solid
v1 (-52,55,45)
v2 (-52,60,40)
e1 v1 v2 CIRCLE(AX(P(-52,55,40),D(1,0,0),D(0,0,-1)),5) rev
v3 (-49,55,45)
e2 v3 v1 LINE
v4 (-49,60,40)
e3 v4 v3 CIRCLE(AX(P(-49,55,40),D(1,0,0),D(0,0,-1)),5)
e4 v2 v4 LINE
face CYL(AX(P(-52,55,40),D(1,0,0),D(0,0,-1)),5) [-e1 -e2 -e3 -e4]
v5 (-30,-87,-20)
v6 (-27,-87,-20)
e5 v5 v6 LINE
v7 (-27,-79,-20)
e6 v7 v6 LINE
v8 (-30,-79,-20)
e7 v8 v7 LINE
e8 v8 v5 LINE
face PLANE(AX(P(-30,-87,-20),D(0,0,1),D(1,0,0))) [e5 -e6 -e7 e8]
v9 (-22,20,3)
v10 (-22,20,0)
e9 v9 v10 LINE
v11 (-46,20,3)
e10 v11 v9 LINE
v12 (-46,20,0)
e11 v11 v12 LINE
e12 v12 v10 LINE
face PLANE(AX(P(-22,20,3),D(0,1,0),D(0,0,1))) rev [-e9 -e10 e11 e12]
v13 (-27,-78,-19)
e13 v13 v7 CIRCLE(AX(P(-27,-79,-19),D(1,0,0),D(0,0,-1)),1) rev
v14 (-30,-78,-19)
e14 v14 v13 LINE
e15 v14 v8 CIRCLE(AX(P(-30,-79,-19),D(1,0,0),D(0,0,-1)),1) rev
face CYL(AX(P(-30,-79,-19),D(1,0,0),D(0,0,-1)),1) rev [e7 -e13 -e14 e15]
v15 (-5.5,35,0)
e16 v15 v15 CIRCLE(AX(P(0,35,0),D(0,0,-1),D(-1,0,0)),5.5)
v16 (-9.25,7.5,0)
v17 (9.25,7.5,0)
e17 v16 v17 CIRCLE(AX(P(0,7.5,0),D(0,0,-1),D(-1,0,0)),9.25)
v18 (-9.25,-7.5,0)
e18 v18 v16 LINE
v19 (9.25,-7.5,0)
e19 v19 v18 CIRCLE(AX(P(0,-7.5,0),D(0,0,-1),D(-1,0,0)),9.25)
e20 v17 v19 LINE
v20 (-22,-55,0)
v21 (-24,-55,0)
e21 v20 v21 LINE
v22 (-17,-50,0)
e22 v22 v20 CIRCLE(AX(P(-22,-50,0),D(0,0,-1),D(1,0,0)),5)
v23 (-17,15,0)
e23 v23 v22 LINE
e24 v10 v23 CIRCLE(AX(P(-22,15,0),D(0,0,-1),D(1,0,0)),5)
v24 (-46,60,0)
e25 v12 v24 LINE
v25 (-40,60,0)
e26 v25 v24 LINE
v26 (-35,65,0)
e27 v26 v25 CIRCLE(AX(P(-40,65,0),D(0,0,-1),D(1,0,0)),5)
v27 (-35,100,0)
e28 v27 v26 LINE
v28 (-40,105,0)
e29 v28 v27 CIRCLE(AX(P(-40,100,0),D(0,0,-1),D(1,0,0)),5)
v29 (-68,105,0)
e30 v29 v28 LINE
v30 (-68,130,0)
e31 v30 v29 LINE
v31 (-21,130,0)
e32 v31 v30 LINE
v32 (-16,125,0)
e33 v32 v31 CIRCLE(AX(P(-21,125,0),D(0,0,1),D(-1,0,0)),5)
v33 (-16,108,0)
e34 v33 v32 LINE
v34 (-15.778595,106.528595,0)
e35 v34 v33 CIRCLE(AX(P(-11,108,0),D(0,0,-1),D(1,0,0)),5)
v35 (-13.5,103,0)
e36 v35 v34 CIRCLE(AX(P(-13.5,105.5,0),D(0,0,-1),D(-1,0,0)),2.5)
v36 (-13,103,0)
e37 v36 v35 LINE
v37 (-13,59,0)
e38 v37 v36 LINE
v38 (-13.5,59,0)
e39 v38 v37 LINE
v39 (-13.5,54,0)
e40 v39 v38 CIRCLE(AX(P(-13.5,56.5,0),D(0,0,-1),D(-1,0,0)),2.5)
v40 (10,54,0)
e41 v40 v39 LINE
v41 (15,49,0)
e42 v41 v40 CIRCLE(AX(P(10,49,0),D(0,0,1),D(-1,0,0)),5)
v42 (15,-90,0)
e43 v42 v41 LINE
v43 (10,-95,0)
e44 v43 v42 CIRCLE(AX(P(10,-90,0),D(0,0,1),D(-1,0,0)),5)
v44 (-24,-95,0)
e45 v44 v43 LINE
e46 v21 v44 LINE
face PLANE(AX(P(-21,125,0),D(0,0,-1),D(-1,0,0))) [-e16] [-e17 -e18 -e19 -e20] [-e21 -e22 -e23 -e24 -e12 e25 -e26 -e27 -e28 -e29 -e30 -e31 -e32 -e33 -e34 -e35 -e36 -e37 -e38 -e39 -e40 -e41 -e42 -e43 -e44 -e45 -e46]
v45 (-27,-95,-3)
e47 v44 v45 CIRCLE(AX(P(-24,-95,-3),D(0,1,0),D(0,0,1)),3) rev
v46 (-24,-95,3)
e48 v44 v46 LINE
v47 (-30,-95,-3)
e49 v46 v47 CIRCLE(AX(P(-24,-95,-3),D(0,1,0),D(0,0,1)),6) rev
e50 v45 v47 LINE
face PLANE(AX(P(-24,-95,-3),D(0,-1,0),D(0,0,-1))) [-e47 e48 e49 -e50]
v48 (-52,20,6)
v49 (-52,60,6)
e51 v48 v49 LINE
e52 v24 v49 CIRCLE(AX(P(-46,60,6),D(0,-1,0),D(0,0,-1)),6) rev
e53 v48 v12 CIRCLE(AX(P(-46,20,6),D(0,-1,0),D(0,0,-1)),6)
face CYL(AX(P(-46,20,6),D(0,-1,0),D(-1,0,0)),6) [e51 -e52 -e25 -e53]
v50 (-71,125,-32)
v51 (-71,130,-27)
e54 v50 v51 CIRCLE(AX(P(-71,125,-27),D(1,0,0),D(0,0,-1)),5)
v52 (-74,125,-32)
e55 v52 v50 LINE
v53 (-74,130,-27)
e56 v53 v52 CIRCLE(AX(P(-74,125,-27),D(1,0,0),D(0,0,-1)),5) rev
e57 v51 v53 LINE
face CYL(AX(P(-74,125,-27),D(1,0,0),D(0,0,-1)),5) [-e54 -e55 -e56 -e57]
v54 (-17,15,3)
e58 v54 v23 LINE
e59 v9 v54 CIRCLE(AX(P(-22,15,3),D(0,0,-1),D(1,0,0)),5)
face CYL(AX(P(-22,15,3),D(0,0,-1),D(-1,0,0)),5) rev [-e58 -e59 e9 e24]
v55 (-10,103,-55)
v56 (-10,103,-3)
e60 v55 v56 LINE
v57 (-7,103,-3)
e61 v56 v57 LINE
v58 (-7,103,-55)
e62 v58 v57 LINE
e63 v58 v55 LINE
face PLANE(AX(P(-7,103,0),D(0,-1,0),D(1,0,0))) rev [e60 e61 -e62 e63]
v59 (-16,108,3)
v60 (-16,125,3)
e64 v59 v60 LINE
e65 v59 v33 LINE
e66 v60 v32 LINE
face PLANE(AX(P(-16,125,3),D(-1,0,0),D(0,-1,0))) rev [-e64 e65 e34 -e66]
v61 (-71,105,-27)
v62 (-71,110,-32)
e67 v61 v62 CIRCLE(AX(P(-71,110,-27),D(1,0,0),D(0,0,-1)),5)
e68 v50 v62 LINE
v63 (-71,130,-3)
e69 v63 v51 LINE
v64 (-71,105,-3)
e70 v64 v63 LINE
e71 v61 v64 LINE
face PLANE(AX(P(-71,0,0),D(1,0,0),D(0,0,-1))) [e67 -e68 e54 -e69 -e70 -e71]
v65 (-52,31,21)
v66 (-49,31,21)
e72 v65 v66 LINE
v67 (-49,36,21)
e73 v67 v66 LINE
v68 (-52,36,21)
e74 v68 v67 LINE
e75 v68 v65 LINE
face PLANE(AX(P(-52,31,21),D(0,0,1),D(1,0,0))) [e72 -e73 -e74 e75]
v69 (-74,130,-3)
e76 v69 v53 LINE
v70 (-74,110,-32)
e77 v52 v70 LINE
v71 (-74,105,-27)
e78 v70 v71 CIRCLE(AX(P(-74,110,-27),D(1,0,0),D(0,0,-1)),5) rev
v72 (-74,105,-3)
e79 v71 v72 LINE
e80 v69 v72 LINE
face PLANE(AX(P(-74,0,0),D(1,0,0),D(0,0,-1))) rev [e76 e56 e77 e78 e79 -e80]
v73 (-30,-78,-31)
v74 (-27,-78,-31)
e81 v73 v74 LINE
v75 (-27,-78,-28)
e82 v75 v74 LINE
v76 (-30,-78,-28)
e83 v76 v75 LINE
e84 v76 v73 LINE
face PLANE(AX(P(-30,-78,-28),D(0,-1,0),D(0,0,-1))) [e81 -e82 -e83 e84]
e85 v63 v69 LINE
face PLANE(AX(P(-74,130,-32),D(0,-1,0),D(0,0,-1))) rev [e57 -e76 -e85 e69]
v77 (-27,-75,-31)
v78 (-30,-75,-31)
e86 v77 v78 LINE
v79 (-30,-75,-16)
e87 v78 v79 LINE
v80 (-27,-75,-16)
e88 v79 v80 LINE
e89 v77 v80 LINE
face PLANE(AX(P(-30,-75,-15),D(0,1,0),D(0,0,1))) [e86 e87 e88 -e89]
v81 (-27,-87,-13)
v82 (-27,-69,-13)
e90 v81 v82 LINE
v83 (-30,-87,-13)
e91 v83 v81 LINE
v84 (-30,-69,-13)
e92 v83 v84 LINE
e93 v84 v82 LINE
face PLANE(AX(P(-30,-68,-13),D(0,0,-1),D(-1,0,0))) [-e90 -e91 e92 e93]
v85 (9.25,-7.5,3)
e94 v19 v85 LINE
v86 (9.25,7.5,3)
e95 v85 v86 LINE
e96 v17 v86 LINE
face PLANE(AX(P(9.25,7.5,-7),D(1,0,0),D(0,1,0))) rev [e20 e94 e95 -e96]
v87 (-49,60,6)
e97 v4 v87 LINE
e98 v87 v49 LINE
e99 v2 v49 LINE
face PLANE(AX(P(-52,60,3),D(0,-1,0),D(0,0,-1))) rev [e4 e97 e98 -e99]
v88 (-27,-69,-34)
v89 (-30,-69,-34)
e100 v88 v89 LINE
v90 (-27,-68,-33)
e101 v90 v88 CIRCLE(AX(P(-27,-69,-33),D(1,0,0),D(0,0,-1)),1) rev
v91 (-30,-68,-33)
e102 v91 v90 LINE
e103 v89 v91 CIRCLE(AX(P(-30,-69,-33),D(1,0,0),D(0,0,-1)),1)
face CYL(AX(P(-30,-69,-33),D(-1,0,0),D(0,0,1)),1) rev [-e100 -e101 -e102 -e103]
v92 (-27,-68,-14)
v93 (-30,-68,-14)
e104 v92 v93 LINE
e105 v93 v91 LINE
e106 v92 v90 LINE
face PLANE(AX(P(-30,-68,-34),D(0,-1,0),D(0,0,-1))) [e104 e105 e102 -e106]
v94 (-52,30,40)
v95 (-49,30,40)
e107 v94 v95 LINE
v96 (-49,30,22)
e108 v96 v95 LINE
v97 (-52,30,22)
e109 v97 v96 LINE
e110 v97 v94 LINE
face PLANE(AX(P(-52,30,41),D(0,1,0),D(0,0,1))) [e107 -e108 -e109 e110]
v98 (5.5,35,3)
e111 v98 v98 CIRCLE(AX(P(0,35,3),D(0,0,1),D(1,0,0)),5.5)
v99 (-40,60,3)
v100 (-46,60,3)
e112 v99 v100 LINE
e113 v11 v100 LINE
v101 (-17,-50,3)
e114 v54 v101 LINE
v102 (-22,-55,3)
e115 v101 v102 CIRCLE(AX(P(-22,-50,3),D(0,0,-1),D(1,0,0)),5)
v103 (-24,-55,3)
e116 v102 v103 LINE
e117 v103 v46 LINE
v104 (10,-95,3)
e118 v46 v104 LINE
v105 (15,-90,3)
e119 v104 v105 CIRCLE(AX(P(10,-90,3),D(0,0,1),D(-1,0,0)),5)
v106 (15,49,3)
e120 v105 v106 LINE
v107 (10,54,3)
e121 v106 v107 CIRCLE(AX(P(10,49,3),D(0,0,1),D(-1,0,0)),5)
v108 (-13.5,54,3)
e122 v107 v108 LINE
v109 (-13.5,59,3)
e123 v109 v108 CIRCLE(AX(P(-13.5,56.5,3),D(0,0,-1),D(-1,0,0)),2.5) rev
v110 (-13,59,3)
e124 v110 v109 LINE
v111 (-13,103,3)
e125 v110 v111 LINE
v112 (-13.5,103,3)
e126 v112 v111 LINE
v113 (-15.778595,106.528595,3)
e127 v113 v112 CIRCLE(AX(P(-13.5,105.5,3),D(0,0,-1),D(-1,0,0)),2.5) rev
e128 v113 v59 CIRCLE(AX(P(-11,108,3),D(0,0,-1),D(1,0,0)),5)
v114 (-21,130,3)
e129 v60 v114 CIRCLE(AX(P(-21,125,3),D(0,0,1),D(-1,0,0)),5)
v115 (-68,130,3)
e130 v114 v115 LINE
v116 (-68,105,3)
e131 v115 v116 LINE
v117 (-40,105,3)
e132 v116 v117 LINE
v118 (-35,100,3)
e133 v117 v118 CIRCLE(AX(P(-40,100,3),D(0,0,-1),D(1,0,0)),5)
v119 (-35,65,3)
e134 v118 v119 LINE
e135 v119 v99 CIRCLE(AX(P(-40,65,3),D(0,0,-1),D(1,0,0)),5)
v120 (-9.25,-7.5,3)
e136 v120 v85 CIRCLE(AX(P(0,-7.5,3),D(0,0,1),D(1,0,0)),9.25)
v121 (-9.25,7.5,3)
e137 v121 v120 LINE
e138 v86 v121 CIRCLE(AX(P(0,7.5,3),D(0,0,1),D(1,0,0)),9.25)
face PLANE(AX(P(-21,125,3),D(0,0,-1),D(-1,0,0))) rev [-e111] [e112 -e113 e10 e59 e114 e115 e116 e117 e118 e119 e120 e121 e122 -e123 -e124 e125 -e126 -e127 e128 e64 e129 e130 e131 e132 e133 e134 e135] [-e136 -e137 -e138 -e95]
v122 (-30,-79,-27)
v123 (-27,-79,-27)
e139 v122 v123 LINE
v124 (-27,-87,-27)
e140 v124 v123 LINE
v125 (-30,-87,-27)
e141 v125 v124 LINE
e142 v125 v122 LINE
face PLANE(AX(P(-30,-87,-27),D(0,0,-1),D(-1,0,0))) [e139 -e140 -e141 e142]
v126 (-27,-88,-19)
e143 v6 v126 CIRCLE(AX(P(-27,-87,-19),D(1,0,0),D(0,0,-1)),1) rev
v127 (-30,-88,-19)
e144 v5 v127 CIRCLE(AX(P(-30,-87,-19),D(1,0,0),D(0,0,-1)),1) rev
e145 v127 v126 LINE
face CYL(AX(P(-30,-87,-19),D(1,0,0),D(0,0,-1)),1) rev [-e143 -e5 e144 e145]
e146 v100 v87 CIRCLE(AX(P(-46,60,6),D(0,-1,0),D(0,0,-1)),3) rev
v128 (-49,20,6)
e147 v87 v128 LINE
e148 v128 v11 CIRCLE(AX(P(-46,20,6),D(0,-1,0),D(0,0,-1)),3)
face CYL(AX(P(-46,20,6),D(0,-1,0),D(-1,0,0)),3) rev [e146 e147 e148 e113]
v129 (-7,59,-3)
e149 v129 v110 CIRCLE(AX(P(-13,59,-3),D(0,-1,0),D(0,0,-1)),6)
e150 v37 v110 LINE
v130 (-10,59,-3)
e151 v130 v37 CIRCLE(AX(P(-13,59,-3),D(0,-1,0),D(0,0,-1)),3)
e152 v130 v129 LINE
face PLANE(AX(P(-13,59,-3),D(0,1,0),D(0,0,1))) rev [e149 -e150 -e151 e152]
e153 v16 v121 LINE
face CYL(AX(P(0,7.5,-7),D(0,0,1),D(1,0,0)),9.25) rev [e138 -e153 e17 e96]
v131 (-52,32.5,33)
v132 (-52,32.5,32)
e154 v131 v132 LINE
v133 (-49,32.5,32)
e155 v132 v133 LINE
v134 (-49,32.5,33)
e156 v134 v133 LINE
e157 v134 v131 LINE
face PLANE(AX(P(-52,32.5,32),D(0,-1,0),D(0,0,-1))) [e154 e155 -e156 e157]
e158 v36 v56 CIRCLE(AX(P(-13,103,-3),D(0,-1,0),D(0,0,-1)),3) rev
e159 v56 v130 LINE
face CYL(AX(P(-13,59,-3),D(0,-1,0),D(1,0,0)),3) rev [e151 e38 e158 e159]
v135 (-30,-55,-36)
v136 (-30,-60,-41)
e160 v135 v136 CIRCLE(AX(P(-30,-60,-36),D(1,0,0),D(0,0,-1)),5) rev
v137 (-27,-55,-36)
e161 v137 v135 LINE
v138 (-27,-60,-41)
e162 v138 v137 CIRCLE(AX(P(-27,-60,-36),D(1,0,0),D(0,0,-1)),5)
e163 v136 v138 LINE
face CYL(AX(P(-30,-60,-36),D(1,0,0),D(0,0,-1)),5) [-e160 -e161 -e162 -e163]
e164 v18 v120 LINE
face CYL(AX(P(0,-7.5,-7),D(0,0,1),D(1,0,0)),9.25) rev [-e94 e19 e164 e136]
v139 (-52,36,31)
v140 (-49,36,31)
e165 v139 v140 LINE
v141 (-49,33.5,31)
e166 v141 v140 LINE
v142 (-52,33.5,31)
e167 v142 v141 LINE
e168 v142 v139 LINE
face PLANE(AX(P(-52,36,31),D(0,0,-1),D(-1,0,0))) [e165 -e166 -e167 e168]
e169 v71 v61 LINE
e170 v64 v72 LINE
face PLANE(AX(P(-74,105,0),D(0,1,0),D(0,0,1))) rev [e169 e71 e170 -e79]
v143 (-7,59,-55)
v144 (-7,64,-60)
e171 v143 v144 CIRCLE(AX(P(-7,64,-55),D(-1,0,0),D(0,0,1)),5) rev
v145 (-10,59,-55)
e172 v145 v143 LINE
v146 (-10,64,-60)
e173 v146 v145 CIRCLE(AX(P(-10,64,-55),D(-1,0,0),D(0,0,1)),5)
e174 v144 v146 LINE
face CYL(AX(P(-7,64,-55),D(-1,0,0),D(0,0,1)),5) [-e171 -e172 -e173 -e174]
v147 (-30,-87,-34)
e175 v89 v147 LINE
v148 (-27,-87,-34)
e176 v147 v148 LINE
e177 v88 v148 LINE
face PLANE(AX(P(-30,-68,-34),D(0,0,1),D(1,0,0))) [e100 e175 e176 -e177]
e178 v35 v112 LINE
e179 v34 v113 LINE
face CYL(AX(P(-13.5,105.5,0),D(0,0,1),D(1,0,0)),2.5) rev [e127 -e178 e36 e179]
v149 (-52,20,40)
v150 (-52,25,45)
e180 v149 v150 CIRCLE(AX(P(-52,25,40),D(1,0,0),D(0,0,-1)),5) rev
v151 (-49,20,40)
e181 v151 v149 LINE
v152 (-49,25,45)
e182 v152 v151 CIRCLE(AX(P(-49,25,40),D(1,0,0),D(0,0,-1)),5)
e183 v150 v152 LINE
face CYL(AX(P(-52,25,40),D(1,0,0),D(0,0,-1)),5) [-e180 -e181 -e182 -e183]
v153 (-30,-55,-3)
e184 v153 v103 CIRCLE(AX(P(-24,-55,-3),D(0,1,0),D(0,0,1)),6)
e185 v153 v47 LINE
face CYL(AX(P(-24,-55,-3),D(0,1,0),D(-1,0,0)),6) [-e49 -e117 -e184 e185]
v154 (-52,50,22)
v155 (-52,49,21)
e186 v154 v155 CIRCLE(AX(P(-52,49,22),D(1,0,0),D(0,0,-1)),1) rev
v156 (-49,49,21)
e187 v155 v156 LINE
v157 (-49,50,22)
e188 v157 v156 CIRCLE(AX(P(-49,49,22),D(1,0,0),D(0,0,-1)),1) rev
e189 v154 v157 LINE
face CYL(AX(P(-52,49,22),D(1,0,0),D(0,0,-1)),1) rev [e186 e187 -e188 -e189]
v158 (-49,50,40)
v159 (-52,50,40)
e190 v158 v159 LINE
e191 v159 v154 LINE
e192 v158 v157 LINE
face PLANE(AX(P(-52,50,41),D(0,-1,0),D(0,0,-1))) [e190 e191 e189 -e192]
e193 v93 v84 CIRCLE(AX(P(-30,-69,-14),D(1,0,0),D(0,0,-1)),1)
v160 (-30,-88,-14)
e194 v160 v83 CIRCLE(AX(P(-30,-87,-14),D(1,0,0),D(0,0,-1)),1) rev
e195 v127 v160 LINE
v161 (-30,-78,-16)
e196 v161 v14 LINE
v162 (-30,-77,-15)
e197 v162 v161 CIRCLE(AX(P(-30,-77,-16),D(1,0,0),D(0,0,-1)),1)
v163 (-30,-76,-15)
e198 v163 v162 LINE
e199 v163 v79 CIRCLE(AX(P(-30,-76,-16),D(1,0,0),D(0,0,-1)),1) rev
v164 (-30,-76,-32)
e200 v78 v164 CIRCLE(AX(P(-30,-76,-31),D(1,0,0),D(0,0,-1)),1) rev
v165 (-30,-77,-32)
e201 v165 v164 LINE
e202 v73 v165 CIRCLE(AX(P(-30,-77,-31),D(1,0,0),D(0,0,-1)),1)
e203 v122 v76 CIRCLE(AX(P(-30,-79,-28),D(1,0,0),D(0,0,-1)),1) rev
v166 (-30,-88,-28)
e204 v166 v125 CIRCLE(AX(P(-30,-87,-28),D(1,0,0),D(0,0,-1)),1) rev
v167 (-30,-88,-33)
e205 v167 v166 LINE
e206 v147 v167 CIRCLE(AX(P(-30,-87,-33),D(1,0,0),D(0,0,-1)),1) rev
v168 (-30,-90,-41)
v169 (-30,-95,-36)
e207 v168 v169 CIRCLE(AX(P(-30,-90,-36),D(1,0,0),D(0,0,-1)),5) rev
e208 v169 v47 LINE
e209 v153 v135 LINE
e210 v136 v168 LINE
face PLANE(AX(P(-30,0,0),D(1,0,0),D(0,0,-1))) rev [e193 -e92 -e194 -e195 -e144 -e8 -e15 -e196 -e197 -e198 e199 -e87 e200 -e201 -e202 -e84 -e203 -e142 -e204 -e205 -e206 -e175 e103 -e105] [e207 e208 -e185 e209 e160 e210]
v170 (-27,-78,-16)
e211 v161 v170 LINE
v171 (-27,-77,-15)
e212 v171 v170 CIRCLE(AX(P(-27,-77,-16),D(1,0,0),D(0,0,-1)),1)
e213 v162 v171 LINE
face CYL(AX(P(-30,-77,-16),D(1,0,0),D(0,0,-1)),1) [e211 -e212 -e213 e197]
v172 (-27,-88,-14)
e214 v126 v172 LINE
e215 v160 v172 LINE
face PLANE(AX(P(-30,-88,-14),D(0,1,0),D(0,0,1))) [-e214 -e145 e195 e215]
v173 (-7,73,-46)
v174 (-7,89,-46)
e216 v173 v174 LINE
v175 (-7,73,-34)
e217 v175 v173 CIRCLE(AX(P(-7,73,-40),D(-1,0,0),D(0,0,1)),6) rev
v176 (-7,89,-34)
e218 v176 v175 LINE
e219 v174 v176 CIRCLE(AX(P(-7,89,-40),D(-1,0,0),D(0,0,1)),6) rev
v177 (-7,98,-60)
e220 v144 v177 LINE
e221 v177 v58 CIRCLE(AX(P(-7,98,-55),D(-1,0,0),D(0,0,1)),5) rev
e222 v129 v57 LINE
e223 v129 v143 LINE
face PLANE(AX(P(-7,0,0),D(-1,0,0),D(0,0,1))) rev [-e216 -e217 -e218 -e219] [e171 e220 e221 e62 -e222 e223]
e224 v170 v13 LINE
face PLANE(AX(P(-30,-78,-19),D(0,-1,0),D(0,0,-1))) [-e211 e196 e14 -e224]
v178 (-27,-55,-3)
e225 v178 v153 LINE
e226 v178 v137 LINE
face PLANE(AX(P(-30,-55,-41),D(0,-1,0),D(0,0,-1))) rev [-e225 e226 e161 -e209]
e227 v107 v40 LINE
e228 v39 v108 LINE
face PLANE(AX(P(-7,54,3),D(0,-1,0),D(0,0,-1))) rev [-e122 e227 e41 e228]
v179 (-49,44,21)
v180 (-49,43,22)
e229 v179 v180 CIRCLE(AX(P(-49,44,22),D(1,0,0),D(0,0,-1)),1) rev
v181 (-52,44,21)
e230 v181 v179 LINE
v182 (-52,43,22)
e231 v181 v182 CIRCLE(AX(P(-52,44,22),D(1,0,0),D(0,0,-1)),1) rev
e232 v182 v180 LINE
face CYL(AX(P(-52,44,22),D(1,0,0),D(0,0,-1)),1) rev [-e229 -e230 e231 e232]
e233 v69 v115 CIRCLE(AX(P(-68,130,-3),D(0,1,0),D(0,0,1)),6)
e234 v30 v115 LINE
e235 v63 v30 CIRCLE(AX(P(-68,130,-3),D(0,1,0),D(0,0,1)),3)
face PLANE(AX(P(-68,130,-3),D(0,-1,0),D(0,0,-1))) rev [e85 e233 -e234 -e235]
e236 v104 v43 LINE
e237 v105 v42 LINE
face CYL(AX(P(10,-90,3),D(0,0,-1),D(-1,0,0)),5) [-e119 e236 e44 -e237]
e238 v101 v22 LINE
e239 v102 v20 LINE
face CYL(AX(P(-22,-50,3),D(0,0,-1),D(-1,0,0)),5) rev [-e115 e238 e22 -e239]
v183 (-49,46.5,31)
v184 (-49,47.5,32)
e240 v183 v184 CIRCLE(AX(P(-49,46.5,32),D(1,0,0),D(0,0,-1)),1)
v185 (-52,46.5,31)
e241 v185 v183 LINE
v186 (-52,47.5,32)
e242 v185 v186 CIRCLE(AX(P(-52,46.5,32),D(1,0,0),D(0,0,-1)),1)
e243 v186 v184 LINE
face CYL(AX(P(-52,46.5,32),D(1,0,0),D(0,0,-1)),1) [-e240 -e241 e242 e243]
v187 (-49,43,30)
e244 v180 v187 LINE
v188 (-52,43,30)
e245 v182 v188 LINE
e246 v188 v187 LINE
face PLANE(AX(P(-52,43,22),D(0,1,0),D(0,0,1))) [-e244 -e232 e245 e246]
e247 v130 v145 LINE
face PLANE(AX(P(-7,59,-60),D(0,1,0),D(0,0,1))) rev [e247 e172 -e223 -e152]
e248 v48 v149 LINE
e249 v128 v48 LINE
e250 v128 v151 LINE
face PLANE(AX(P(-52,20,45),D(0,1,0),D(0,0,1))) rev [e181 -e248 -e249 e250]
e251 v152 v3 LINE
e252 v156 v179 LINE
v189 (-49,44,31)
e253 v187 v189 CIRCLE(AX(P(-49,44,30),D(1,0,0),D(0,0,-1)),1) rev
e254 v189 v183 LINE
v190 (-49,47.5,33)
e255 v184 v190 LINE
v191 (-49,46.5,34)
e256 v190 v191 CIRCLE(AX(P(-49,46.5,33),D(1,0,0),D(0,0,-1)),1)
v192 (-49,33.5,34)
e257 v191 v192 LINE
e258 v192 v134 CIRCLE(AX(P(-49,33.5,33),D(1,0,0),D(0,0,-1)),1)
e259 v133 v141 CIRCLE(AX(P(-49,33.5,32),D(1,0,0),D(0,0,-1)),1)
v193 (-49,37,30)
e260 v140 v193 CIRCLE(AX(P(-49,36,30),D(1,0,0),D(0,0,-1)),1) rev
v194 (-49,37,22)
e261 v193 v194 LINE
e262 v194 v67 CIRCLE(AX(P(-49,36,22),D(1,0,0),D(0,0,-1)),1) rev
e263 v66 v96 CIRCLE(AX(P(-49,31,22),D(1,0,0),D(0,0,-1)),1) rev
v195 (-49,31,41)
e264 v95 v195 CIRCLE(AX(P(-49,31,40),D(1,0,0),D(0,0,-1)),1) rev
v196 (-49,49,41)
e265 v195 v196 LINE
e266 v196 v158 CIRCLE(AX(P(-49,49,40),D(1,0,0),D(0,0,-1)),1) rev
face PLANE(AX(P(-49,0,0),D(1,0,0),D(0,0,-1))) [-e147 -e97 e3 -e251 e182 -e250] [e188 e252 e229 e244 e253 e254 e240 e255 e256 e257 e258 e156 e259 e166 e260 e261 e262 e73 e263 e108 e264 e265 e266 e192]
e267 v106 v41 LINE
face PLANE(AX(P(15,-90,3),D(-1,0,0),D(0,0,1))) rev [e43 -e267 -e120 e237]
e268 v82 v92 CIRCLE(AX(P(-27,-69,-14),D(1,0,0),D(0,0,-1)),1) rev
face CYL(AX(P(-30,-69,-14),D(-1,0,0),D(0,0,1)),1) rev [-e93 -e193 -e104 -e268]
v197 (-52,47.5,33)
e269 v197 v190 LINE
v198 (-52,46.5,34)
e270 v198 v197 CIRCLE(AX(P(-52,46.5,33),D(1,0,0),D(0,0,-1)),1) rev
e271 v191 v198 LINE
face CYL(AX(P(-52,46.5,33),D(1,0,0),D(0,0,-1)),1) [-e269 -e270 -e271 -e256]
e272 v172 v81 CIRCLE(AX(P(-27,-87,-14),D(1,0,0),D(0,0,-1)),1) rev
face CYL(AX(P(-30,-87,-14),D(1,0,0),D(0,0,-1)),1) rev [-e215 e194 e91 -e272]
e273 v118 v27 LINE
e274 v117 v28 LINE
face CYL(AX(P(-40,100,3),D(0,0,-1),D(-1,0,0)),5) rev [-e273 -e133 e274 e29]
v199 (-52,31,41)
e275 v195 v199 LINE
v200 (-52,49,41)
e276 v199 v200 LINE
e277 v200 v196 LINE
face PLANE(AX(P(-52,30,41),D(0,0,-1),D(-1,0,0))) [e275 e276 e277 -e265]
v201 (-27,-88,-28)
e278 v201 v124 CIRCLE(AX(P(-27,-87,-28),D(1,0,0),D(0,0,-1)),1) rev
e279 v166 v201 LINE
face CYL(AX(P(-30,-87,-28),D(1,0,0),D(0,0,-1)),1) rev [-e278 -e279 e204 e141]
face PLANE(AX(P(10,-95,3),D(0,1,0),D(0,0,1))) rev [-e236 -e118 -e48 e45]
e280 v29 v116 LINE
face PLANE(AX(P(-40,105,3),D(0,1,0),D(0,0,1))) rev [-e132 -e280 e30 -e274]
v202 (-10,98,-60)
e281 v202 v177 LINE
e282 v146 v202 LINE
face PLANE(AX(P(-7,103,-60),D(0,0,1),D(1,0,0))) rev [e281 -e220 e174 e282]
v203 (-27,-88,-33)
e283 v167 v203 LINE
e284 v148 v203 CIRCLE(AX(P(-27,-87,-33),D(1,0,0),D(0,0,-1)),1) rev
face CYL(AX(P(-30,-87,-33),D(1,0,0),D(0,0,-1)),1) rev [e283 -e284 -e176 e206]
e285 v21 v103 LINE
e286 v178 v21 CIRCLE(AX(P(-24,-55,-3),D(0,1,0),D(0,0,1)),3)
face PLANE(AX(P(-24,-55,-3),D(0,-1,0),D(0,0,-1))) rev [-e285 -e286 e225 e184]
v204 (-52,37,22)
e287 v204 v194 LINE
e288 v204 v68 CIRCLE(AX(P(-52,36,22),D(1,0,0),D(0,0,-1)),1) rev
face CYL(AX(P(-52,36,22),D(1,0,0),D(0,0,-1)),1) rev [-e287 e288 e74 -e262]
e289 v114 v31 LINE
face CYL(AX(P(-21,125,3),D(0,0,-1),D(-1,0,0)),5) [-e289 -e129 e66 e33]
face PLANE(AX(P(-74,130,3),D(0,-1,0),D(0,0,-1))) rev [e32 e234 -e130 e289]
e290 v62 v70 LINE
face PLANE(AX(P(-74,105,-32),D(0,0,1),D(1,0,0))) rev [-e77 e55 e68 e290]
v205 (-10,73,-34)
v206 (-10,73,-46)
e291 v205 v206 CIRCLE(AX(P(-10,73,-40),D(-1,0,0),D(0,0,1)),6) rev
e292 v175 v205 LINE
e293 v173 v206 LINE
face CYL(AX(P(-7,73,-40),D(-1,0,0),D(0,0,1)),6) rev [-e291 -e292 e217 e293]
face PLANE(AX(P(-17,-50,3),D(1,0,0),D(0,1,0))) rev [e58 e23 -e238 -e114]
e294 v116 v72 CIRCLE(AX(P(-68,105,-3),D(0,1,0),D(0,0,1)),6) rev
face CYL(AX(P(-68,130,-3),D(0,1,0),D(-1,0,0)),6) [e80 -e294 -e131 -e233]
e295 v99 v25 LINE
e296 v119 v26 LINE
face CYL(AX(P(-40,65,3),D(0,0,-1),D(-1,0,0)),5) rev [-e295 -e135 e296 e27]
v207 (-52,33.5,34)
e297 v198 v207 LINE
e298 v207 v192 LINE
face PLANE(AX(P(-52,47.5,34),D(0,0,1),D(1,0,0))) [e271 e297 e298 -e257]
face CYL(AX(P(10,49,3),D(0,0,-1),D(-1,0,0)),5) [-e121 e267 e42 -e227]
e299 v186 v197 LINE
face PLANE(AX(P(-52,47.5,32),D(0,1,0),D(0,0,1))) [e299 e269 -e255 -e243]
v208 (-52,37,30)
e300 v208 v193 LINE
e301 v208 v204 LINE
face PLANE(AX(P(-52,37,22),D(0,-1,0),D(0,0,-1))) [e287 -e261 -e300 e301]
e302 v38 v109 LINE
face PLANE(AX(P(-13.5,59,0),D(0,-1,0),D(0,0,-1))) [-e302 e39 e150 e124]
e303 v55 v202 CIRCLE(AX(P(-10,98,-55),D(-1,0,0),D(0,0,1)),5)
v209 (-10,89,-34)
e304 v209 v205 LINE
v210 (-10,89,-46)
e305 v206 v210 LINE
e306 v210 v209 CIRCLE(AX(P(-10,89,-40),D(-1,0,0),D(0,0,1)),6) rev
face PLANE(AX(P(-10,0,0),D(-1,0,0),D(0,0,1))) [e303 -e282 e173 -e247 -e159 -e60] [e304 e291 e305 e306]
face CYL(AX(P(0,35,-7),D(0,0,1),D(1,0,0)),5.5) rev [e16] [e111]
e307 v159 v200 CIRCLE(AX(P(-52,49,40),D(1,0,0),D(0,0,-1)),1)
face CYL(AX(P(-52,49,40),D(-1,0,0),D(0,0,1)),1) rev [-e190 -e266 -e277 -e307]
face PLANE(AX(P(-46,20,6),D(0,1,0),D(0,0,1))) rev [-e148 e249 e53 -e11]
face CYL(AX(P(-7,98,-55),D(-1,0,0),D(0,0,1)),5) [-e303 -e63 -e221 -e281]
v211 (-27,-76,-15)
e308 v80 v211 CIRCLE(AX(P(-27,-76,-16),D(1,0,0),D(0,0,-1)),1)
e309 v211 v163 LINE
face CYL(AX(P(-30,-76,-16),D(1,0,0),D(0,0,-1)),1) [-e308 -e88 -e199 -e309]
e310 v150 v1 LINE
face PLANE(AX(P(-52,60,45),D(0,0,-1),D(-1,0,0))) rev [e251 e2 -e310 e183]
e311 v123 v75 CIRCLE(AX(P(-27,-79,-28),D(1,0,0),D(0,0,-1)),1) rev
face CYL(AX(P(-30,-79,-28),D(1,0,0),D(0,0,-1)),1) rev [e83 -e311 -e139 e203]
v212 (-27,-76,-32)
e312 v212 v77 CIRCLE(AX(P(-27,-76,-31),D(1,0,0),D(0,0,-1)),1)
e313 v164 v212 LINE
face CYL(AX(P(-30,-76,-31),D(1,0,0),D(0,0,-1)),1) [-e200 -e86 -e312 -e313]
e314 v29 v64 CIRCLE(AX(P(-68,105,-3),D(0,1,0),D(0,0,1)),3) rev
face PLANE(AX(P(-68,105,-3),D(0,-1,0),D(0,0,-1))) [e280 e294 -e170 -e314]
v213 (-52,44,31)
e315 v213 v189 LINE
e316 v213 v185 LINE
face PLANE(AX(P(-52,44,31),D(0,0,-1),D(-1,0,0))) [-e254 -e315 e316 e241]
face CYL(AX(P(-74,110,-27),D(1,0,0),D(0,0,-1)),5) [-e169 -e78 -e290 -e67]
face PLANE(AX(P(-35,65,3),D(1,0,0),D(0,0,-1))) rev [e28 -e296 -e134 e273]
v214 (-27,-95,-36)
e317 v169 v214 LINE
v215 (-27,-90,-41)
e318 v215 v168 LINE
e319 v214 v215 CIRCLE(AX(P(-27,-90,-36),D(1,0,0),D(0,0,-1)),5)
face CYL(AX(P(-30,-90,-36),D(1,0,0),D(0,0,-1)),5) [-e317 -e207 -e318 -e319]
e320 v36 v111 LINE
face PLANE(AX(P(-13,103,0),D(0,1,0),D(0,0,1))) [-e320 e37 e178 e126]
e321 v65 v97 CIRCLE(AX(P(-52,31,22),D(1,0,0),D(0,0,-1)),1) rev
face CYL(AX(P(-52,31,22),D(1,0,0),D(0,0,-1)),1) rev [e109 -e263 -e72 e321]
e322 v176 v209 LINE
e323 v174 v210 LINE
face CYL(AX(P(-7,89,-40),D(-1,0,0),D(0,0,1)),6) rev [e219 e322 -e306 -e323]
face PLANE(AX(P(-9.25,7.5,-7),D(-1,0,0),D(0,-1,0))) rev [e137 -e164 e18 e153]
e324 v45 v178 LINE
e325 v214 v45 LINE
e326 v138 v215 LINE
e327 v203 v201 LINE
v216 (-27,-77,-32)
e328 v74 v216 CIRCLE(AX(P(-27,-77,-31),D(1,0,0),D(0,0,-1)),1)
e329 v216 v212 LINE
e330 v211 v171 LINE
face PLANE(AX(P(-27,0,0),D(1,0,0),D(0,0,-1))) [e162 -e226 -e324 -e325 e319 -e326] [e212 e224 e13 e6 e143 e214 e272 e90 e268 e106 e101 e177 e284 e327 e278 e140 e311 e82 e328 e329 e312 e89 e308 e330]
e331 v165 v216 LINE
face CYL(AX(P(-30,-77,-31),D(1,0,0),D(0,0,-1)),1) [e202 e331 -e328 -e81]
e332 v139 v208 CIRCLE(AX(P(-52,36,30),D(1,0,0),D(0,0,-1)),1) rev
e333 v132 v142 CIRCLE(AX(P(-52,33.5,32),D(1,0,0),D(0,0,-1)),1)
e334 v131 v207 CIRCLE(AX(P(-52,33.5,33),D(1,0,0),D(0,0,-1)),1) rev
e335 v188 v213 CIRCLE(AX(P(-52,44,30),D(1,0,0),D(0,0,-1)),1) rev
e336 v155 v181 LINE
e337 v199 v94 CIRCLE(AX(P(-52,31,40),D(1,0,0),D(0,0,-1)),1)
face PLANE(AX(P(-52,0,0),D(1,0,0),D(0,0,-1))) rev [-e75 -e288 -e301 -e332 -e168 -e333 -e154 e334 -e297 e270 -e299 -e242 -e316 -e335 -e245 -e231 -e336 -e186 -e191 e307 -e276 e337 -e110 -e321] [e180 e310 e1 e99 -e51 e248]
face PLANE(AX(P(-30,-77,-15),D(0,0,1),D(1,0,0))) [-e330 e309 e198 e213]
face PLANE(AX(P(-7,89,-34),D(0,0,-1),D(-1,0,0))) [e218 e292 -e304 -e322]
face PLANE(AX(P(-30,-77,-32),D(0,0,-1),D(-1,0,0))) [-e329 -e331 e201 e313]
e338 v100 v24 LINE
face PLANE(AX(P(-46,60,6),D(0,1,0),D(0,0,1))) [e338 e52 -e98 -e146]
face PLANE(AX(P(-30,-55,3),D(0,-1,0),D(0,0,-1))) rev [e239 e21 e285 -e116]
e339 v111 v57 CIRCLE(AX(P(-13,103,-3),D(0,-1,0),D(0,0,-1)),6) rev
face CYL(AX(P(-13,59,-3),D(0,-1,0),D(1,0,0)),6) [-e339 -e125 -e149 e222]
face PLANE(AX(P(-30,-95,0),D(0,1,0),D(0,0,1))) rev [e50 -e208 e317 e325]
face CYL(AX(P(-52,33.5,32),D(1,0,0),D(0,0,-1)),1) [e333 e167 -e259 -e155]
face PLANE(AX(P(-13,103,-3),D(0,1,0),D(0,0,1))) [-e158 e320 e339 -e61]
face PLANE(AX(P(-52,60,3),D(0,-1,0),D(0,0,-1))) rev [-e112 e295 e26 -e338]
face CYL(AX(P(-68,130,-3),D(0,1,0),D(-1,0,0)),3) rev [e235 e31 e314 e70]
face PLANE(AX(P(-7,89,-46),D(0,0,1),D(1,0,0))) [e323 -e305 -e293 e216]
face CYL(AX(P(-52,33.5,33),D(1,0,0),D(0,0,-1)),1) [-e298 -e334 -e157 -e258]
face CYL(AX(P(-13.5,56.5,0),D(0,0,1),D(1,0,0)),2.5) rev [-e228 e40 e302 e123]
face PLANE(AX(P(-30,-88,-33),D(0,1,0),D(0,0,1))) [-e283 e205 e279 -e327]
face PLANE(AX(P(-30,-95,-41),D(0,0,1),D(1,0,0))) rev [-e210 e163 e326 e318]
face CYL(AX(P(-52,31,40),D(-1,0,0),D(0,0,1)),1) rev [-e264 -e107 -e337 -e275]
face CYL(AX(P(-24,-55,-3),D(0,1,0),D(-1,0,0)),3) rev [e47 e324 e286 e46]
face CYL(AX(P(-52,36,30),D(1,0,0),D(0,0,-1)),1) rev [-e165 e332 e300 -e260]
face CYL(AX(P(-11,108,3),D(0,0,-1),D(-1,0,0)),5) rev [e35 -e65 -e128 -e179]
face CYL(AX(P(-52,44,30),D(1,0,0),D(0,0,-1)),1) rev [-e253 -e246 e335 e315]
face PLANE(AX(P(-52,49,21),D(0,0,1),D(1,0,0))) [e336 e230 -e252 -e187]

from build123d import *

# Parameters (mm, degrees)
BASE_FLANGE1_DEPTH           = 3
SKETCH6_R                    = 5.5
CUT_EXTRUDE1_DEPTH           = 10
EDGE_FLANGE2_START           = -6.5
EDGE_FLANGE2_OUTLINE_W       = 5
EDGE_FLANGE2_OUTLINE_H       = 3
EDGE_FLANGE2_DEPTH           = 6.5
EDGE_FLANGE2_START_2         = -0.63372
EDGE_FLANGE2_2_OUTLINE_W     = 44
EDGE_FLANGE2_2_OUTLINE_H     = 3
EDGE_FLANGE2_2_DEPTH         = 0.63372
EDGE_FLANGE2_START_3         = -3
EDGE_FLANGE2_3_OUTLINE_W     = 44
EDGE_FLANGE2_3_OUTLINE_H     = 60
EDGE_FLANGE2_3_DEPTH         = 2.36628
EDGE_FLANGE2_4_DEPTH         = 3
EDGE_FLANGE2_START_4         = -34
EDGE_FLANGE2_5_OUTLINE_W     = 0.63372
EDGE_FLANGE2_5_OUTLINE_H     = 44
EDGE_FLANGE2_5_DEPTH         = 31
EDGE_FLANGE2_START_5         = -60
EDGE_FLANGE2_6_OUTLINE_W     = 0.63372
EDGE_FLANGE2_6_OUTLINE_H     = 44
EDGE_FLANGE2_6_DEPTH         = 14
EDGE_FLANGE2_START_6         = 59
EDGE_FLANGE2_7_DEPTH         = 44
EDGE_FLANGE2_8_OUTLINE_W     = 0.63372
EDGE_FLANGE2_8_OUTLINE_H     = 12
EDGE_FLANGE2_8_DEPTH         = 2.2355
EDGE_FLANGE2_START_7         = -7.63372
EDGE_FLANGE2_9_DEPTH         = 0.63372
EDGE_FLANGE2_10_DEPTH        = 44
EDGE_FLANGE2_START_8         = -7.76405
EDGE_FLANGE2_11_OUTLINE_W    = 44
EDGE_FLANGE2_11_OUTLINE_H    = 3
EDGE_FLANGE2_11_DEPTH        = 0.13033
FILLET1_R                    = 5
EDGE_FLANGE3_STRIP_W         = 18
EDGE_FLANGE3_STRIP_H         = 3
EDGE_FLANGE3_STRIP_CUT_DEPTH = 25
EDGE_FLANGE3_DEPTH           = 25
FILLET2_R                    = 5
EDGE_FLANGE4_STRIP_W         = 18
EDGE_FLANGE4_STRIP_H         = 3
EDGE_FLANGE4_STRIP_CUT_DEPTH = 40
EDGE_FLANGE4_DEPTH           = 40
EDGE_FLANGE4_PROFILE_W       = 40
EDGE_FLANGE4_PROFILE_H       = 39
EDGE_FLANGE4_FLAT_DEPTH      = 3
FILLET3_R                    = 1
FILLET4_R                    = 5
EDGE_FLANGE5_STRIP_W         = 18
EDGE_FLANGE5_STRIP_H         = 3
EDGE_FLANGE5_STRIP_CUT_DEPTH = 40
EDGE_FLANGE5_DEPTH           = 40
EDGE_FLANGE5_PROFILE_W       = 40
EDGE_FLANGE5_PROFILE_H       = 38
EDGE_FLANGE5_FLAT_DEPTH      = 3
FILLET5_R                    = 1
FILLET6_R                    = 5


with BuildPart() as part:
    # Base-Flange1: sheet metal written as solids
    # Sketch1 → Base-Flange1 (new body)
    with BuildSketch(Plane(origin=(0, 0, 0), x_dir=(0, 1, 0), z_dir=(0, 0, 1))):
        with BuildLine():
            Line((-90, -15), (49, -15))
            ThreePointArc((49, -15), (52.535533906, -13.535533906), (54, -10))
            Line((54, -10), (54, 7))
            Line((54, 7), (103, 7))
            Line((103, 7), (103, 11))
            ThreePointArc((103, 11), (104.464466094, 14.535533906), (108, 16))
            Line((108, 16), (125, 16))
            ThreePointArc((125, 16), (128.535533906, 17.464466094), (130, 21))
            Line((130, 21), (130, 74))
            Line((130, 74), (105, 74))
            Line((105, 74), (105, 40))
            ThreePointArc((105, 40), (103.535533906, 36.464466094), (100, 35))
            Line((100, 35), (65, 35))
            ThreePointArc((65, 35), (61.464466094, 36.464466094), (60, 40))
            Line((60, 40), (60, 52))
            Line((60, 52), (20, 52))
            Line((20, 52), (20, 22))
            ThreePointArc((20, 22), (18.535533906, 18.464466094), (15, 17))
            Line((15, 17), (-50, 17))
            ThreePointArc((-50, 17), (-53.535533906, 18.464466094), (-55, 22))
            Line((-55, 22), (-55, 30))
            Line((-55, 30), (-95, 30))
            Line((-95, 30), (-95, -10))
            ThreePointArc((-95, -10), (-93.535533906, -13.535533906), (-90, -15))
        make_face()
    extrude(amount=BASE_FLANGE1_DEPTH)

    # Sketch6 → Cut-Extrude1 (cut)
    with BuildSketch(Plane.XY.offset(3)):
        with Locations((0, 35)):
            Circle(SKETCH6_R)
        with BuildLine():
            Line((9.25, 7.5), (9.25, -7.5))
            ThreePointArc((9.25, -7.5), (0, -16.75), (-9.25, -7.5))
            Line((-9.25, -7.5), (-9.25, 7.5))
            ThreePointArc((-9.25, 7.5), (0, 16.75), (9.25, 7.5))
        make_face()
    extrude(amount=-CUT_EXTRUDE1_DEPTH, mode=Mode.SUBTRACT)

    # Edge-Flange2: read off the stored shape, not the designer's step
    # Edge-Flange2 outline → Edge-Flange2 (cut)
    with BuildSketch(Plane(origin=(-7, 0, 0), x_dir=(0, -1, 0), z_dir=(1, 0, 0)).offset(EDGE_FLANGE2_START)):
        with Locations((-56.5, -1.5)):
            Rectangle(EDGE_FLANGE2_OUTLINE_W, EDGE_FLANGE2_OUTLINE_H)
    extrude(amount=EDGE_FLANGE2_DEPTH, mode=Mode.SUBTRACT)

    # Edge-Flange2 2 outline → Edge-Flange2 2 (cut)
    with BuildSketch(Plane(origin=(-7, 0, 0), x_dir=(0, -1, 0), z_dir=(1, 0, 0)).offset(EDGE_FLANGE2_START_2)):
        with Locations((-81, -1.5)):
            Rectangle(EDGE_FLANGE2_2_OUTLINE_W, EDGE_FLANGE2_2_OUTLINE_H)
    extrude(amount=EDGE_FLANGE2_2_DEPTH, mode=Mode.SUBTRACT)

    # Edge-Flange2 3 outline → Edge-Flange2 3 (add)
    with BuildSketch(Plane(origin=(-7, 0, 0), x_dir=(0, -1, 0), z_dir=(1, 0, 0)).offset(EDGE_FLANGE2_START_3)):
        with Locations((-81, 30)):
            Rectangle(EDGE_FLANGE2_3_OUTLINE_W, EDGE_FLANGE2_3_OUTLINE_H)
        with BuildLine():
            Line((-73, 34), (-89, 34))
            ThreePointArc((-89, 34), (-95, 40), (-89, 46))
            Line((-89, 46), (-73, 46))
            ThreePointArc((-73, 46), (-67, 40), (-73, 34))
        make_face(mode=Mode.SUBTRACT)
    extrude(amount=EDGE_FLANGE2_3_DEPTH)

    # Edge-Flange2 4 outline → Edge-Flange2 4 (cut)
    with BuildSketch(Plane.XY):
        with BuildLine():
            Line((-13.5, 54), (-13.5, 59))
            ThreePointArc((-13.5, 59), (-16, 56.5), (-13.5, 54))
        make_face()
        with BuildLine():
            Line((-13.5, 103), (-11, 103))
            ThreePointArc((-11, 103), (-13.970098723, 103.977747698), (-15.778594569, 106.528594569))
            ThreePointArc((-15.778594569, 106.528594569), (-15.600176948, 104.143807982), (-13.5, 103))
        make_face()
    extrude(amount=EDGE_FLANGE2_4_DEPTH, mode=Mode.SUBTRACT)

    # Edge-Flange2 5 outline → Edge-Flange2 5 (add)
    with BuildSketch(Plane.XY.offset(EDGE_FLANGE2_START_4)):
        with Locations((-7.31686, 81)):
            Rectangle(EDGE_FLANGE2_5_OUTLINE_W, EDGE_FLANGE2_5_OUTLINE_H)
    extrude(amount=EDGE_FLANGE2_5_DEPTH)

    # Edge-Flange2 6 outline → Edge-Flange2 6 (add)
    with BuildSketch(Plane.XY.offset(EDGE_FLANGE2_START_5)):
        with Locations((-7.31686, 81)):
            Rectangle(EDGE_FLANGE2_6_OUTLINE_W, EDGE_FLANGE2_6_OUTLINE_H)
    extrude(amount=EDGE_FLANGE2_6_DEPTH)

    # Edge-Flange2 7 outline → Edge-Flange2 7 (add)
    with BuildSketch(Plane(origin=(0, 0, 0), x_dir=(1, 0, 0), z_dir=(0, 1, 0)).offset(EDGE_FLANGE2_START_6)):
        with BuildLine():
            ThreePointArc((-7.63372, 0.31615221), (-7.160578796, 1.621174413), (-7, 3))
            Line((-7, 3), (-7.63372, 3))
            Line((-7.63372, 3), (-7.63372, 0.31615221))
        make_face()
        with BuildLine():
            Line((-13, 0), (-10, 0))
            Line((-10, 0), (-10, 3))
            ThreePointArc((-10, 3), (-10.878679656, 0.878679656), (-13, 0))
        make_face()
    extrude(amount=EDGE_FLANGE2_7_DEPTH)

    # Edge-Flange2 8 outline → Edge-Flange2 8 (add)
    with BuildSketch(Plane(origin=(0, 0, 0), x_dir=(1, 0, 0), z_dir=(0, 1, 0)).offset(EDGE_FLANGE2_START_6)):
        with Locations((-7.31686, 40)):
            Rectangle(EDGE_FLANGE2_8_OUTLINE_W, EDGE_FLANGE2_8_OUTLINE_H)
    extrude(amount=EDGE_FLANGE2_8_DEPTH)

    # Edge-Flange2 9 outline → Edge-Flange2 9 (add)
    with BuildSketch(Plane.YZ.offset(EDGE_FLANGE2_START_7)):
        with BuildLine():
            Line((103, -46), (103, -34))
            Line((103, -34), (89, -34))
            ThreePointArc((89, -34), (95, -40), (89, -46))
            Line((89, -46), (103, -46))
        make_face()
        with BuildLine():
            Line((73, -34), (59, -34))
            Line((59, -34), (59, -46))
            Line((59, -46), (73, -46))
            ThreePointArc((73, -46), (67, -40), (73, -34))
        make_face()
    extrude(amount=EDGE_FLANGE2_9_DEPTH)

    # Edge-Flange2 10 outline → Edge-Flange2 10 (cut)
    with BuildSketch(Plane(origin=(0, 0, 0), x_dir=(1, 0, 0), z_dir=(0, 1, 0)).offset(EDGE_FLANGE2_START_6)):
        with BuildLine():
            ThreePointArc((-7.63372, 0.31615221), (-9.845882591, -2.104071254), (-13, -3))
            Line((-13, -3), (-7.63372, -3))
            Line((-7.63372, -3), (-7.63372, 0.31615221))
        make_face()
    extrude(amount=EDGE_FLANGE2_10_DEPTH, mode=Mode.SUBTRACT)

    # Edge-Flange2 11 outline → Edge-Flange2 11 (cut)
    with BuildSketch(Plane.YZ.offset(EDGE_FLANGE2_START_8)):
        with Locations((81, 1.5)):
            Rectangle(EDGE_FLANGE2_11_OUTLINE_W, EDGE_FLANGE2_11_OUTLINE_H)
    extrude(amount=EDGE_FLANGE2_11_DEPTH, mode=Mode.SUBTRACT)

    # Fillet1
    fillet1_edges = [part.edges().sort_by_distance(p)[0] for p in [
        (-8.5, 103, -60),
        (-8.5, 59, -60),
    ]]
    fillet(fillet1_edges, radius=FILLET1_R)

    # Edge-Flange3: sheet metal written as solids
    # Edge-Flange3 strip (on a plane across the edge) → Edge-Flange3 strip cut (cut)
    with BuildSketch(Plane(origin=(-74, 105, 0), x_dir=(1, 0, 0), z_dir=(0, 1, 0))):
        with Locations((-3, -1.5)):
            Rectangle(EDGE_FLANGE3_STRIP_W, EDGE_FLANGE3_STRIP_H)
    extrude(amount=EDGE_FLANGE3_STRIP_CUT_DEPTH, mode=Mode.SUBTRACT)

    # Edge-Flange3 section (on a plane across the edge) → Edge-Flange3 (add)
    with BuildSketch(Plane(origin=(-74, 105, 0), x_dir=(1, 0, 0), z_dir=(0, 1, 0))):
        with BuildLine():
            Line((0, 3), (0, 32))
            Line((0, 32), (3, 32))
            Line((3, 32), (3, 3))
            ThreePointArc((3, 3), (3.878679656, 0.878679656), (6, 0))
            Line((6, 0), (6, -3))
            ThreePointArc((6, -3), (1.757359313, -1.242640687), (0, 3))
        make_face()
    extrude(amount=EDGE_FLANGE3_DEPTH)

    # Fillet2
    fillet2_edges = [part.edges().sort_by_distance(p)[0] for p in [
        (-72.5, 105, -32),
        (-72.5, 130, -32),
    ]]
    fillet(fillet2_edges, radius=FILLET2_R)

    # Edge-Flange4: sheet metal written as solids
    # Edge-Flange4 strip (on a plane across the edge) → Edge-Flange4 strip cut (cut)
    with BuildSketch(Plane(origin=(-52, 60, 3), x_dir=(1, 0, 0), z_dir=(0, -1, 0))):
        with Locations((-3, -1.5)):
            Rectangle(EDGE_FLANGE4_STRIP_W, EDGE_FLANGE4_STRIP_H)
    extrude(amount=EDGE_FLANGE4_STRIP_CUT_DEPTH, mode=Mode.SUBTRACT)

    # Edge-Flange4 bend section (on a plane across the edge) → Edge-Flange4 (add)
    with BuildSketch(Plane(origin=(-52, 60, 3), x_dir=(1, 0, 0), z_dir=(0, -1, 0))):
        with BuildLine():
            Line((0, 3), (3, 3))
            ThreePointArc((3, 3), (3.878679656, 0.878679656), (6, 0))
            Line((6, 0), (6, -3))
            ThreePointArc((6, -3), (1.757359313, -1.242640687), (0, 3))
        make_face()
    extrude(amount=EDGE_FLANGE4_DEPTH)

    # Edge-Flange4 profile (on flange) → Edge-Flange4 flat (add)
    with BuildSketch(Plane(origin=(-52, 0, 3), x_dir=(0, -1, 0), z_dir=(-1, 0, 0))):
        with Locations((-40, 22.5)):
            Rectangle(EDGE_FLANGE4_PROFILE_W, EDGE_FLANGE4_PROFILE_H)
        with BuildLine():
            Line((-30, 38), (-30, 19))
            ThreePointArc((-30, 19), (-30.292893219, 18.292893219), (-31, 18))
            Line((-31, 18), (-36, 18))
            ThreePointArc((-36, 18), (-36.707106781, 18.292893219), (-37, 19))
            Line((-37, 19), (-37, 27))
            ThreePointArc((-37, 27), (-36.707106781, 27.707106781), (-36, 28))
            Line((-36, 28), (-33.5, 28))
            ThreePointArc((-33.5, 28), (-32.792893219, 28.292893219), (-32.5, 29))
            Line((-32.5, 29), (-32.5, 31))
            Line((-32.5, 31), (-47.5, 31))
            Line((-47.5, 31), (-47.5, 29))
            ThreePointArc((-47.5, 29), (-47.207106781, 28.292893219), (-46.5, 28))
            Line((-46.5, 28), (-44, 28))
            ThreePointArc((-44, 28), (-43.292893219, 27.707106781), (-43, 27))
            Line((-43, 27), (-43, 19))
            ThreePointArc((-43, 19), (-43.292893219, 18.292893219), (-44, 18))
            Line((-44, 18), (-49, 18))
            ThreePointArc((-49, 18), (-49.707106781, 18.292893219), (-50, 19))
            Line((-50, 19), (-50, 38))
            Line((-50, 38), (-30, 38))
        make_face(mode=Mode.SUBTRACT)
    extrude(amount=-EDGE_FLANGE4_FLAT_DEPTH)

    # Fillet3
    fillet3_edges = [part.edges().sort_by_distance(p)[0] for p in [
        (-50.5, 30, 41),
        (-50.5, 50, 41),
        (-50.5, 47.5, 34),
        (-50.5, 32.5, 34),
    ]]
    fillet(fillet3_edges, radius=FILLET3_R)

    # Fillet4
    fillet4_edges = [part.edges().sort_by_distance(p)[0] for p in [
        (-50.5, 60, 45),
        (-50.5, 20, 45),
    ]]
    fillet(fillet4_edges, radius=FILLET4_R)

    # Edge-Flange5: sheet metal written as solids
    # Edge-Flange5 strip (on a plane across the edge) → Edge-Flange5 strip cut (cut)
    with BuildSketch(Plane(origin=(-30, -95, 0), x_dir=(1, 0, 0), z_dir=(0, 1, 0))):
        with Locations((-3, -1.5)):
            Rectangle(EDGE_FLANGE5_STRIP_W, EDGE_FLANGE5_STRIP_H)
    extrude(amount=EDGE_FLANGE5_STRIP_CUT_DEPTH, mode=Mode.SUBTRACT)

    # Edge-Flange5 bend section (on a plane across the edge) → Edge-Flange5 (add)
    with BuildSketch(Plane(origin=(-30, -95, 0), x_dir=(1, 0, 0), z_dir=(0, 1, 0))):
        with BuildLine():
            Line((0, 3), (3, 3))
            ThreePointArc((3, 3), (3.878679656, 0.878679656), (6, 0))
            Line((6, 0), (6, -3))
            ThreePointArc((6, -3), (1.757359313, -1.242640687), (0, 3))
        make_face()
    extrude(amount=EDGE_FLANGE5_DEPTH)

    # Edge-Flange5 profile (on flange) → Edge-Flange5 flat (add)
    with BuildSketch(Plane(origin=(-30, 0, 0), x_dir=(0, 1, 0), z_dir=(-1, 0, 0))):
        with Locations((-75, 22)):
            Rectangle(EDGE_FLANGE5_PROFILE_W, EDGE_FLANGE5_PROFILE_H)
        with BuildLine():
            ThreePointArc((-88, 33), (-87.707106781, 33.707106781), (-87, 34))
            Line((-87, 34), (-68, 34))
            Line((-68, 34), (-68, 13))
            Line((-68, 13), (-87, 13))
            ThreePointArc((-87, 13), (-87.707106781, 13.292893219), (-88, 14))
            Line((-88, 14), (-88, 19))
            ThreePointArc((-88, 19), (-87.707106781, 19.707106781), (-87, 20))
            Line((-87, 20), (-79, 20))
            ThreePointArc((-79, 20), (-78.292893219, 19.707106781), (-78, 19))
            Line((-78, 19), (-78, 16))
            ThreePointArc((-78, 16), (-77.707106781, 15.292893219), (-77, 15))
            Line((-77, 15), (-75, 15))
            Line((-75, 15), (-75, 32))
            Line((-75, 32), (-77, 32))
            ThreePointArc((-77, 32), (-77.707106781, 31.707106781), (-78, 31))
            Line((-78, 31), (-78, 28))
            ThreePointArc((-78, 28), (-78.292893219, 27.292893219), (-79, 27))
            Line((-79, 27), (-87, 27))
            ThreePointArc((-87, 27), (-87.707106781, 27.292893219), (-88, 28))
            Line((-88, 28), (-88, 33))
        make_face(mode=Mode.SUBTRACT)
    extrude(amount=-EDGE_FLANGE5_FLAT_DEPTH)

    # Fillet5
    fillet5_edges = [part.edges().sort_by_distance(p)[0] for p in [
        (-28.5, -68, -13),
        (-28.5, -68, -34),
        (-28.5, -75, -32),
        (-28.5, -75, -15),
    ]]
    fillet(fillet5_edges, radius=FILLET5_R)

    # Fillet6
    fillet6_edges = [part.edges().sort_by_distance(p)[0] for p in [
        (-28.5, -95, -41),
        (-28.5, -55, -41),
    ]]
    fillet(fillet6_edges, radius=FILLET6_R)


solid = part.part
